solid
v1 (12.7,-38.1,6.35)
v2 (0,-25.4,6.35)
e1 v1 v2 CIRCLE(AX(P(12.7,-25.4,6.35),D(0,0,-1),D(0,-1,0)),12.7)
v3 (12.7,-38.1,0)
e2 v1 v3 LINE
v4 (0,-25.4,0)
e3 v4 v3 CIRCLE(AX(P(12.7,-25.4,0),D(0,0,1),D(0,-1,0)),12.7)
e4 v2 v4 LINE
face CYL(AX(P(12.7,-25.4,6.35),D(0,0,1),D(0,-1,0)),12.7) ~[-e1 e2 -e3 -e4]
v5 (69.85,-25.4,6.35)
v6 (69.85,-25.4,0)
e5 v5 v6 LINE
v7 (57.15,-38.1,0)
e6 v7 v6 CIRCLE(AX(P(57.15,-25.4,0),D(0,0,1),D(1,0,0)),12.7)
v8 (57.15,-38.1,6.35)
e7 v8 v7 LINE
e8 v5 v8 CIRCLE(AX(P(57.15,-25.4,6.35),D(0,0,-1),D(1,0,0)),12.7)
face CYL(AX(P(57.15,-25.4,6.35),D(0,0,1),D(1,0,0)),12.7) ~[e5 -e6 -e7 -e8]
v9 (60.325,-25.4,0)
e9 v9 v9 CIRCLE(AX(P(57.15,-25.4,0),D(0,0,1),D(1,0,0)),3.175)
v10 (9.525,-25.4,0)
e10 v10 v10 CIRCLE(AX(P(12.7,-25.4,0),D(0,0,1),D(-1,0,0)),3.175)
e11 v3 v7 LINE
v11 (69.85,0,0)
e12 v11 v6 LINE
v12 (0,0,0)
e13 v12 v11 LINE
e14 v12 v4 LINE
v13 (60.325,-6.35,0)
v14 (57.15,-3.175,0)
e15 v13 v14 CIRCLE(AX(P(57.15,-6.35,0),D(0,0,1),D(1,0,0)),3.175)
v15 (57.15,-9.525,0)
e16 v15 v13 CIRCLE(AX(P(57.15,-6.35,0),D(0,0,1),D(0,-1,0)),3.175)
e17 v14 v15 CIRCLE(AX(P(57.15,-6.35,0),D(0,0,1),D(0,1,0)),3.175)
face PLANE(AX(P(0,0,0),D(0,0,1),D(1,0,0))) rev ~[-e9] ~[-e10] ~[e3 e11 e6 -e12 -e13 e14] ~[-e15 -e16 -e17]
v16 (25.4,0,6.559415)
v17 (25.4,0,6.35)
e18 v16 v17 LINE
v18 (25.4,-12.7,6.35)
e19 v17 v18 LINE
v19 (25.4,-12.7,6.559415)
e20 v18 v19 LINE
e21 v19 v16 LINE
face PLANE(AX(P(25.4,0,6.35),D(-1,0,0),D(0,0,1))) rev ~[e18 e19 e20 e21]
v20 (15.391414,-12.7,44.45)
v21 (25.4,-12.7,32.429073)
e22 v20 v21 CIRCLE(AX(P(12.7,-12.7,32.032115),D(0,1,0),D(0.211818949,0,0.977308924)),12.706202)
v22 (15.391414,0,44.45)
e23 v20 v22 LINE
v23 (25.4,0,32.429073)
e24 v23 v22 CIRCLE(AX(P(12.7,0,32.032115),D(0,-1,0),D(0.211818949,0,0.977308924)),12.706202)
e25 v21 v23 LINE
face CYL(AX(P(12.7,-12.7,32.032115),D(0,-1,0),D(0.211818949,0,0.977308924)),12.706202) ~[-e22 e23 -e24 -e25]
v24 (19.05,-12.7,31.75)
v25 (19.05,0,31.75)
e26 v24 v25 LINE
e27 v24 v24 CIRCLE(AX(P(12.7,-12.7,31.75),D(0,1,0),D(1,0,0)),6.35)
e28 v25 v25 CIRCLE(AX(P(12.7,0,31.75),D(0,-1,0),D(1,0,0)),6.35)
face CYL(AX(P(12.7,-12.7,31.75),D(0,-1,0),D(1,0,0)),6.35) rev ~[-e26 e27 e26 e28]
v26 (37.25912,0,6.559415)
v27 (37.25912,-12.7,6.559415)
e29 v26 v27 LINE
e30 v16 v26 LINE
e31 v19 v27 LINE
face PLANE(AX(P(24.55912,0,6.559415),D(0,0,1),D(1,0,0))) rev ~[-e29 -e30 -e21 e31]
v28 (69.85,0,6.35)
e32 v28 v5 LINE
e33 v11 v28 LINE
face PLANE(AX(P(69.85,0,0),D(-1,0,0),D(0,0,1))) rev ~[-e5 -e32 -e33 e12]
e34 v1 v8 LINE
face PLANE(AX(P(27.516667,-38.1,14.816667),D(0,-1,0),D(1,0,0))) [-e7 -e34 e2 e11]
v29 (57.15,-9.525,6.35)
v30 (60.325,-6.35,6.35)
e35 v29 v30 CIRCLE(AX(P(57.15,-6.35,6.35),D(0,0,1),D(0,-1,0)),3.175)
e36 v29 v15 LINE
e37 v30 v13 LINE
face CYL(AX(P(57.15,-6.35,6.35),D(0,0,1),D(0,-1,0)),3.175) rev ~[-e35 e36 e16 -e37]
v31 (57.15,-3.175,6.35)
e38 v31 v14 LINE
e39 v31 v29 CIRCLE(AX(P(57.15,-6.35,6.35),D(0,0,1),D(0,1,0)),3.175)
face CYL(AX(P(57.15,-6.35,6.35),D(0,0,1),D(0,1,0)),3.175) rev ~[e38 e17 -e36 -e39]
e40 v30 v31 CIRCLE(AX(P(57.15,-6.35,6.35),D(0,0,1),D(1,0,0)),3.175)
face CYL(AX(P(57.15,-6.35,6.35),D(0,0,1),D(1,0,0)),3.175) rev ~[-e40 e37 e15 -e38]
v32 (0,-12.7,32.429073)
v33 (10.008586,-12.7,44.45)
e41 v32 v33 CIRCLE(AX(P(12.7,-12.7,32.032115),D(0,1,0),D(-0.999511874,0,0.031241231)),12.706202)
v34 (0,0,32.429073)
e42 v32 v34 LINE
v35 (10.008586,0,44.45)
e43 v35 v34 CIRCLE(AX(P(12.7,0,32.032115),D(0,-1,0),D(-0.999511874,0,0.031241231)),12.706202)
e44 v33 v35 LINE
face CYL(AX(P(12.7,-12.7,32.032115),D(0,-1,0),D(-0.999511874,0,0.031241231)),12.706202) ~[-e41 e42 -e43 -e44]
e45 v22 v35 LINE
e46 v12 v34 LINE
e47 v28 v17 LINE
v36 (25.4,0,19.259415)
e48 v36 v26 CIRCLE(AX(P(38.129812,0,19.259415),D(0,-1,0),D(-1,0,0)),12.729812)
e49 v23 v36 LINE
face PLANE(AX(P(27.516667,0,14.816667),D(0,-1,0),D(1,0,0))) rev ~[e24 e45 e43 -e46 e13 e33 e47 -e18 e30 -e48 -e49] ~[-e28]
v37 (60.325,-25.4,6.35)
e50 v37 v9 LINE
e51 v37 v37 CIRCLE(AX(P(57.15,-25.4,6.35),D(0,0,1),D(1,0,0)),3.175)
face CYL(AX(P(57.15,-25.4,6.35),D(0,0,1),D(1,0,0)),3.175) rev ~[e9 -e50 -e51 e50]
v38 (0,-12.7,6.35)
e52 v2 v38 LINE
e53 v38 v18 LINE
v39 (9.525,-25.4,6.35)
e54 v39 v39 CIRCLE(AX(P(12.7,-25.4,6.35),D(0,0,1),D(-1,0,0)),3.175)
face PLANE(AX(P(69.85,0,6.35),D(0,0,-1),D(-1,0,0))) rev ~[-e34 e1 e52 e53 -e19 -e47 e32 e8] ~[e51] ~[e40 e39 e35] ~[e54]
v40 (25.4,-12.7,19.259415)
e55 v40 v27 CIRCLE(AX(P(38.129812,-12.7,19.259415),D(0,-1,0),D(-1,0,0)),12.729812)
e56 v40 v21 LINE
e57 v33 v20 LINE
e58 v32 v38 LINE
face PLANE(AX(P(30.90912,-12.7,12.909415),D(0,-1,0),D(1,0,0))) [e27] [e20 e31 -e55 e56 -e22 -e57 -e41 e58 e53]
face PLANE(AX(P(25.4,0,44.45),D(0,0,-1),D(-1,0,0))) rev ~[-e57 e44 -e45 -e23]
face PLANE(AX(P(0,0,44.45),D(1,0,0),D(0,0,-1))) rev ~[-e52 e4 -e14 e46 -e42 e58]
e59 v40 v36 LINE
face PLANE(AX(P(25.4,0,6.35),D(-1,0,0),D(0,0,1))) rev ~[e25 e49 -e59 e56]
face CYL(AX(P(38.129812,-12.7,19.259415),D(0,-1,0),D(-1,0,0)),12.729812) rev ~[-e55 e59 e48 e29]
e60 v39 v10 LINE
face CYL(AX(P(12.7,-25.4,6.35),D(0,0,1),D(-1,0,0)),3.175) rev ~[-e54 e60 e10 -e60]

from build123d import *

# Parameters (mm, degrees)
F1_DEPTH  = 38.1
F2_W      = 25.4
F2_H      = 38.1
F3_DEPTH  = 25.4
F4_R      = 6.35
F5_DEPTH  = 12.701
F7_DEPTH  = 12.701
F8_W      = 12.7
F8_H      = 12.7
F9_DEPTH  = 12.7
F11_DEPTH = 12.701
F13_DEPTH = 6.351
F14_R     = 3.175
F15_DEPTH = 6.351


with BuildPart() as f1:
    # F0 (on Front) → F1 (new body)
    with BuildSketch(Plane.XZ):
        Polygon((25.4, 44.45), (0, 44.45), (0, 0), (69.85, 0), (69.85, 6.35), (25.4, 6.35), align=None)
    extrude(amount=F1_DEPTH)

    # F2 (on face) → F3 (cut)
    with BuildSketch(Plane.XZ.offset(38.1)):
        with Locations((12.7, 25.4)):
            Rectangle(F2_W, F2_H)
    extrude(amount=-F3_DEPTH, mode=Mode.SUBTRACT)

    # F4 (on face) → F5 (cut, through all)
    with BuildSketch(Plane.XZ.offset(12.7)):
        with Locations((12.7, 31.75)):
            Circle(F4_R)
    extrude(amount=-F5_DEPTH, mode=Mode.SUBTRACT)

    # F6 (on face) → F7 (cut, through all)
    with BuildSketch(Plane.XZ.offset(12.7)):
        with BuildLine():
            ThreePointArc((0, 32.429072573), (-0.0062022328, 32.0321151685), (0, 31.635157764))
            Line((0, 31.635157764), (0, 32.429072573))
        make_face()
        with BuildLine():
            ThreePointArc((19.05, 31.75), (12.642576534, 38.0997403526), (6.3510385683, 31.635157764))
            Line((6.3510385683, 31.635157764), (19.0489614317, 31.635157764))
            ThreePointArc((19.0489614317, 31.635157764), (19.0497403526, 31.692576534), (19.05, 31.75))
        make_face()
        with BuildLine():
            Line((0, 44.45), (0, 32.429072573))
            ThreePointArc((0, 32.429072573), (2.9352888733, 40.1621823142), (10.0085855964, 44.45))
            Line((10.0085855964, 44.45), (0, 44.45))
        make_face()
        with BuildLine():
            ThreePointArc((15.3914144036, 44.45), (12.7, 44.7383174013), (10.0085855964, 44.45))
            Line((10.0085855964, 44.45), (15.3914144036, 44.45))
        make_face()
        with BuildLine():
            Line((25.4, 32.429072573), (25.4, 31.635157764))
            ThreePointArc((25.4, 31.635157764), (25.4062022328, 32.0321151685), (25.4, 32.429072573))
        make_face()
        with BuildLine():
            Line((25.4, 44.45), (15.3914144036, 44.45))
            ThreePointArc((15.3914144036, 44.45), (22.4647111267, 40.1621823142), (25.4, 32.429072573))
            Line((25.4, 32.429072573), (25.4, 44.45))
        make_face()
    extrude(amount=-F7_DEPTH, mode=Mode.SUBTRACT)

    # F8 (on Front) → F9 (join)
    with BuildSketch(Plane.XZ):
        with Locations((30.9091203046, 12.9094149452)):
            Rectangle(F8_W, F8_H)
    extrude(amount=F9_DEPTH)

    # F10 (on face) → F11 (cut, through all)
    with BuildSketch(Plane.XZ.offset(12.7)):
        with BuildLine():
            Line((37.2591203046, 19.2594149452), (25.4, 19.2594149452))
            ThreePointArc((25.4, 19.2594149452), (28.8257307878, 10.5713666258), (37.2591203046, 6.5594149452))
            Line((37.2591203046, 6.5594149452), (37.2591203046, 19.2594149452))
        make_face()
    extrude(amount=-F11_DEPTH, mode=Mode.SUBTRACT)

    # F12 (on face) → F13 (cut, through all)
    with BuildSketch(Plane.XY.offset(6.35)):
        with BuildLine():
            ThreePointArc((12.7, -38.1), (3.7197438789, -34.3802561211), (0, -25.4))
            Line((0, -25.4), (0, -38.1))
            Line((0, -38.1), (12.7, -38.1))
        make_face()
        with BuildLine():
            ThreePointArc((69.85, -25.4), (66.1302561211, -34.3802561211), (57.15, -38.1))
            Line((57.15, -38.1), (69.85, -38.1))
            Line((69.85, -38.1), (69.85, -25.4))
        make_face()
    extrude(amount=-F13_DEPTH, mode=Mode.SUBTRACT)

    # F14 (on face) → F15 (cut, through all)
    with BuildSketch(Plane.XY.offset(6.35)):
        with BuildLine():
            ThreePointArc((15.875, -25.4), (12.7, -22.225), (9.525, -25.4))
            ThreePointArc((9.525, -25.4), (12.7, -28.575), (15.875, -25.4))
        make_face()
        with Locations((57.15, -25.4)):
            Circle(F14_R)
        with BuildLine():
            Line((57.15, -9.525), (57.15, -3.175))
            ThreePointArc((57.15, -3.175), (53.975, -6.35), (57.15, -9.525))
        make_face()
        with BuildLine():
            ThreePointArc((60.325, -6.35), (59.3950640303, -4.1049359697), (57.15, -3.175))
            Line((57.15, -3.175), (57.15, -9.525))
            ThreePointArc((57.15, -9.525), (59.3950640303, -8.5950640303), (60.325, -6.35))
        make_face()
    extrude(amount=-F15_DEPTH, mode=Mode.SUBTRACT)


solid = f1.part
